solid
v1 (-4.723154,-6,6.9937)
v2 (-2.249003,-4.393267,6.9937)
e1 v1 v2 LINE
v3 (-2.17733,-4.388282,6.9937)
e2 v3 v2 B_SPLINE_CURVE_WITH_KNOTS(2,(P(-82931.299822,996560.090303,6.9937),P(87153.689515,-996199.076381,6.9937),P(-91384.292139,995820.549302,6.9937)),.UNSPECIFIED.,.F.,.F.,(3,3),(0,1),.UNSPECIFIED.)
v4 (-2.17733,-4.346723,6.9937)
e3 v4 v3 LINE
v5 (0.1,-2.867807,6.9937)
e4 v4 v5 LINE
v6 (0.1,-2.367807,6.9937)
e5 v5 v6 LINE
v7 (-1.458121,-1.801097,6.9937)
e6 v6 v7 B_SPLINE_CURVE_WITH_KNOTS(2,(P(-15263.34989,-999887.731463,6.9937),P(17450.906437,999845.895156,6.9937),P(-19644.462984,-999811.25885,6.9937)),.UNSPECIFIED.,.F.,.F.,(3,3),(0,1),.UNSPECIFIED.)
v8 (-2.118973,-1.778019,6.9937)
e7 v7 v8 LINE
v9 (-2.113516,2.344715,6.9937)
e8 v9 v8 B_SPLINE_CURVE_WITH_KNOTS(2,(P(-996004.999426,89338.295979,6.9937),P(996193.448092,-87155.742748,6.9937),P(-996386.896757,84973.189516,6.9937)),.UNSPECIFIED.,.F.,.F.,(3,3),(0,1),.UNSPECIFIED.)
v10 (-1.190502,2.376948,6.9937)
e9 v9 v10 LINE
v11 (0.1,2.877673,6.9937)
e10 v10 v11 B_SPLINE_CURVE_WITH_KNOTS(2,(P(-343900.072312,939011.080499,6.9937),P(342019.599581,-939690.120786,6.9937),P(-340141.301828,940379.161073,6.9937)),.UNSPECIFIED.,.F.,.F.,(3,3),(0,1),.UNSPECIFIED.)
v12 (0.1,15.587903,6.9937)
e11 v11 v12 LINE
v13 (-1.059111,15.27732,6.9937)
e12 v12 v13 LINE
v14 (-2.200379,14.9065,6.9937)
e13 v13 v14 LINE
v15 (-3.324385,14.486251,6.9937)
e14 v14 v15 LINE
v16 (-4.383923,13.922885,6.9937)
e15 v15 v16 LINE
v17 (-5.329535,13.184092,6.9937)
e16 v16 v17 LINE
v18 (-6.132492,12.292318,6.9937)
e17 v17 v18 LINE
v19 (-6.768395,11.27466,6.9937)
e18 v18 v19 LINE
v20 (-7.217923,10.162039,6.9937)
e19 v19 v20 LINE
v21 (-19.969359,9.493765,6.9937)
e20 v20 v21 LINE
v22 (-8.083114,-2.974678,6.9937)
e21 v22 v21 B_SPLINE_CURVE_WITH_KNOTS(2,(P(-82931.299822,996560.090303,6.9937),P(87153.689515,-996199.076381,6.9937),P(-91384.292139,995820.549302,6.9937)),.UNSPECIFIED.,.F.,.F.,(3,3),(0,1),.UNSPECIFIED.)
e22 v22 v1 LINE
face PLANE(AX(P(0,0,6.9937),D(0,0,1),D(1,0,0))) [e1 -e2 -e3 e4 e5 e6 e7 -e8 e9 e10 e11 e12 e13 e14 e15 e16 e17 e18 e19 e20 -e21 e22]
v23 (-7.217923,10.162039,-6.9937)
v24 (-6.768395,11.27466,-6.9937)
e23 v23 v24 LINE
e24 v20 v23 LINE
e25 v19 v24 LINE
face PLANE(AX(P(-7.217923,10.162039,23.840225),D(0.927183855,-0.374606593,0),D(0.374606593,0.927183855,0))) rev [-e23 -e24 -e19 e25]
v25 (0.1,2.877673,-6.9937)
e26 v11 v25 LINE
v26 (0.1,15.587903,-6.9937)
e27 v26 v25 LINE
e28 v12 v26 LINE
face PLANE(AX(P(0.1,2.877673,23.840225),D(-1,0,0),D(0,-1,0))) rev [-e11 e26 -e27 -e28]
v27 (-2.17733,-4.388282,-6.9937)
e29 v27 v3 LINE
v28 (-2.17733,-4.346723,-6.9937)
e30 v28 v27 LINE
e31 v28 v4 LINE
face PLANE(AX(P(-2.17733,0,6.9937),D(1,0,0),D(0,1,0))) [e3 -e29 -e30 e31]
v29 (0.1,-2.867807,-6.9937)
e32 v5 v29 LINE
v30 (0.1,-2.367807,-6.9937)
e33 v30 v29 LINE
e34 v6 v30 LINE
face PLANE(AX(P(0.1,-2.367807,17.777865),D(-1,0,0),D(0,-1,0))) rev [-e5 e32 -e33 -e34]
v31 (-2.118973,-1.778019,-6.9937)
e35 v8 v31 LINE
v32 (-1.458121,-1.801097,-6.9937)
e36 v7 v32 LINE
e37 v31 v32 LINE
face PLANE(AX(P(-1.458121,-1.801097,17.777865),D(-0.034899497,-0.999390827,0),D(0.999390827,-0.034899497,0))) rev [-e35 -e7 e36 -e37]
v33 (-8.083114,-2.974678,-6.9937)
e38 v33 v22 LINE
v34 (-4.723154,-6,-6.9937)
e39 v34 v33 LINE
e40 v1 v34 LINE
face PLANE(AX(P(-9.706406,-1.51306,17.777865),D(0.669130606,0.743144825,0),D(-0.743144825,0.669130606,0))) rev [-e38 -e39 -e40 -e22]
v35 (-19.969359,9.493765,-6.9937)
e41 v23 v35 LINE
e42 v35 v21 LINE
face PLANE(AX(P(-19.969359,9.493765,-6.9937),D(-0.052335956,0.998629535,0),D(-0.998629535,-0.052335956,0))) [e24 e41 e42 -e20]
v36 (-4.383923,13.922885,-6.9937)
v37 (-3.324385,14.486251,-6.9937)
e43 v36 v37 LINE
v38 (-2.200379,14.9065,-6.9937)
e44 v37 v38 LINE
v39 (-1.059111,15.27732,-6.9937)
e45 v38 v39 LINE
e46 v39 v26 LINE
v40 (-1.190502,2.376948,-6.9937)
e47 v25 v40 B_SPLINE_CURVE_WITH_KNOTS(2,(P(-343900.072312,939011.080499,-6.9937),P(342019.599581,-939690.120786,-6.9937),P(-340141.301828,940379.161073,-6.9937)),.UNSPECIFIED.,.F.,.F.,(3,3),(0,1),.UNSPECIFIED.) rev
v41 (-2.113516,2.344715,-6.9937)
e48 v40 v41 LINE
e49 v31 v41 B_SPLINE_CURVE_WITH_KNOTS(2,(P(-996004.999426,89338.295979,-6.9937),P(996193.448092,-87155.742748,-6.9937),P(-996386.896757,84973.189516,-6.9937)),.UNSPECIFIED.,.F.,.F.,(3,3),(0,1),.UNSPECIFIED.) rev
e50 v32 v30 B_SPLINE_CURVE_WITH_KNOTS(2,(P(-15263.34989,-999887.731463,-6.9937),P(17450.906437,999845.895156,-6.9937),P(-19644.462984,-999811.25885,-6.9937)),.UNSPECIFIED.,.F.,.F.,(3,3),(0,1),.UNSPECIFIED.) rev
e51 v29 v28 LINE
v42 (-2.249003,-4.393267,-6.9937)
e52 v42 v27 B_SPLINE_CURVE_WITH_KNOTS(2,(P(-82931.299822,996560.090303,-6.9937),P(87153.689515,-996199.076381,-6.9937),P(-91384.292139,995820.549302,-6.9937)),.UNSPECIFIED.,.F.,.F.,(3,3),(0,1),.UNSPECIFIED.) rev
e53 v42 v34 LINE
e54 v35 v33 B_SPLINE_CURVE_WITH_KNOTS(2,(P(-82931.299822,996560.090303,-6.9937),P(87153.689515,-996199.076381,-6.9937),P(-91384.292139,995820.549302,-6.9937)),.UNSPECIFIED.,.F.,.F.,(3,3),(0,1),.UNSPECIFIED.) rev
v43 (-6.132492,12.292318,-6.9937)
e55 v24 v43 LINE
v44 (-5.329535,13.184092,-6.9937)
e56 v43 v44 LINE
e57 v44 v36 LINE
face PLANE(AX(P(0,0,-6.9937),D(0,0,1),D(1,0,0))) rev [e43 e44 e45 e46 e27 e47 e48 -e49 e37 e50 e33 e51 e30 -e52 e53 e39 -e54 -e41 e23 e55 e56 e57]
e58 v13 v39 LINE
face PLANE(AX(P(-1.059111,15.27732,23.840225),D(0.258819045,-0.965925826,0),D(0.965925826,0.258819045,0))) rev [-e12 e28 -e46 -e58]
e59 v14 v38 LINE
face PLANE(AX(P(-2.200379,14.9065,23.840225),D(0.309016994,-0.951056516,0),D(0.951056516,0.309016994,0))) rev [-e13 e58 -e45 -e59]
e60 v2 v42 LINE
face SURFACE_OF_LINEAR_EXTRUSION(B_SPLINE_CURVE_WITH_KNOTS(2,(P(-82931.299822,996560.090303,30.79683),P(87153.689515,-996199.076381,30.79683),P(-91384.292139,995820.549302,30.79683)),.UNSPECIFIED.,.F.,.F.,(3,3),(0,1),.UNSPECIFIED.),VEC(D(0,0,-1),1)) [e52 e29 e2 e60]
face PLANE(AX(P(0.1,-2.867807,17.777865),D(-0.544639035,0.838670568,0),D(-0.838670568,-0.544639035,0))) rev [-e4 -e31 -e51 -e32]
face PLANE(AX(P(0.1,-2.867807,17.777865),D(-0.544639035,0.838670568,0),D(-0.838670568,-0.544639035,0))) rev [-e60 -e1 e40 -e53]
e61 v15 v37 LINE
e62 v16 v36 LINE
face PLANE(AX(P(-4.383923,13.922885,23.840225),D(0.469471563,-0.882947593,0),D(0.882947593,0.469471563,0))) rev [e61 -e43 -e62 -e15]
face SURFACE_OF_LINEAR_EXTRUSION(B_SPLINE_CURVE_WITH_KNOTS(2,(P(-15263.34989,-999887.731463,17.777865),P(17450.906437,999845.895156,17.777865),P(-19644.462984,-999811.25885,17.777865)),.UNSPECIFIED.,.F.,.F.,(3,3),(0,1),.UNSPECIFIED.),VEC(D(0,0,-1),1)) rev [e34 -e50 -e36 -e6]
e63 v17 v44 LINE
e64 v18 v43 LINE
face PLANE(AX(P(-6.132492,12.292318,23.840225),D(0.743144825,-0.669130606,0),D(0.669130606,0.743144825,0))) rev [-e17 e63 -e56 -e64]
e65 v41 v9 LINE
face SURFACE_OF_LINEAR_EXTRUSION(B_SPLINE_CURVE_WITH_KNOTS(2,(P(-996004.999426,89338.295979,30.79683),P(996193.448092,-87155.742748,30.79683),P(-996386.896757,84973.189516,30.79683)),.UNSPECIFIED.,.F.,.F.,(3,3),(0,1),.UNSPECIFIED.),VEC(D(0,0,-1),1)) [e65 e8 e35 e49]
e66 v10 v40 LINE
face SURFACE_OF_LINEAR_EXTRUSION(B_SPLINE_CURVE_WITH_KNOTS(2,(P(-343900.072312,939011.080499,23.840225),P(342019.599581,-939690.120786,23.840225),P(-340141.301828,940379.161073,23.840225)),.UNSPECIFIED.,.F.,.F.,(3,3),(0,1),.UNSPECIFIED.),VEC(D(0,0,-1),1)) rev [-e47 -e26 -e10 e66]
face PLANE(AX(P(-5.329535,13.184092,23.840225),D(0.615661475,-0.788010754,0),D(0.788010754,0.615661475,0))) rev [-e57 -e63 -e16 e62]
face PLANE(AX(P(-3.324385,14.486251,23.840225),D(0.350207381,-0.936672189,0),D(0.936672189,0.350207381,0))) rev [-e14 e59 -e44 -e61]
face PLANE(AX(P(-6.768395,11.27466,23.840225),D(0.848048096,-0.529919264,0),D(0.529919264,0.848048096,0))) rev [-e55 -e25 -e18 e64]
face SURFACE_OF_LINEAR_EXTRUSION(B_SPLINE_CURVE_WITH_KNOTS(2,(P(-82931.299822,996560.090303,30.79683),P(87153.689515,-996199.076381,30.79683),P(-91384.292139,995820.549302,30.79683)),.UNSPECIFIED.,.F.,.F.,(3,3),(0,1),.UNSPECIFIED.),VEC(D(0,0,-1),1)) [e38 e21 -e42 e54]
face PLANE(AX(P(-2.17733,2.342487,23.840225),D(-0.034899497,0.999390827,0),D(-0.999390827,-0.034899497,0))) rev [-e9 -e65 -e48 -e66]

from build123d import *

# Parameters (mm, degrees)
CROQUIS_BASE_DEPTH              = 6.9937
LENTE_PPAL_1_REACH              = 29.176
LENTE_PPAL_1_DIRECTION_2_REACH  = 29.176
LENTE_PPAL_2_DEPTH              = 28.175928622
LENTE_PPAL_2_DEPTH_BACK         = 28.175928622
CROQUIS9_3_OUTSIDE_W            = 30.065
CROQUIS9_3_OUTSIDE_H            = 25.937
LENTE_FRONTAL_REACH             = 25.403
LENTE_FRONTAL_DIRECTION_2_REACH = 25.403
LENTE_TRASERA_REACH             = 28.281
LENTE_TRASERA_DIRECTION_2_REACH = 28.281


with BuildPart() as part:
    # Croquis1 → croquis base (new, symmetric)
    with BuildSketch(Plane.XY):
        with BuildLine():
            Line((-6.994875026, 10.477389992), (-8.981845695, 12.608155172))
            Line((-8.981845695, 12.608155172), (-23.035921146, 11.871612288))
            Line((-23.035921146, 11.871612288), (-23.035921146, 11.54013782))
            ThreePointArc((-23.035921146, 11.54013782), (-20.949684518, 9.582335705), (-18.945192114, 7.540918896))
            add(Edge.make_bspline(
                [(-18.945192114, 7.540918896), (-10.215008384, -3.697644103), (-2.846604825, -5.059081104)],
                knots=[0.497667241, 0.497667241, 0.497667241, 0.49955428, 0.49955428, 0.49955428], degree=2))
            add(Edge.make_bspline(
                [(-2.846604825, -5.059081104), (-2.498165198, -4.87297933), (-2.177330417, -4.684462446)],
                knots=[0.498812075, 0.498812075, 0.498812075, 0.498911556, 0.498911556, 0.498911556], degree=2))
            Line((-2.177330418, -4.684462446), (-2.177330418, 6.186438919))
            add(Edge.make_bspline(
                [(-2.177330418, 6.186438919), (-4.063319702, 8.141636997), (-6.994875026, 10.477389992)],
                knots=[0.50138293, 0.50138293, 0.50138293, 0.502013312, 0.502013312, 0.502013312], degree=2))
        make_face()
    extrude(amount=CROQUIS_BASE_DEPTH, both=True)

    # lente ppal 1: up to this face of the body (flat: up to its plane)
    lente_ppal_1_end = Plane(part.part.faces().sort_by_distance((-10.153546236, 5.159655324, 6.9937))[0])
    # Croquis9 → lente ppal 1 (add, up to the picked face)
    with BuildSketch(Plane.XY, mode=Mode.PRIVATE) as lente_ppal_1_sk1:
        with BuildLine():
            Line((-2.177330418, -4.388282022), (-2.177330418, -1.840420572))
            add(Edge.make_bspline(
                [(-2.177330418, 2.424232079), (-0.304369248, 0.128042884), (-2.177330418, -1.840420572)],
                knots=[0, 0, 0, 1, 1, 1], degree=2))
            Line((-2.177330418, 2.424232079), (-2.177330418, 6.082860828))
            Line((-2.177330418, 6.082860828), (-10.309820395, 10))
            Line((-10.309820395, 10), (-19.969359014, 9.493765032))
            add(Edge.make_bspline(
                [(-2.177330418, -4.388282022), (-10.4130765, -4.994158739), (-19.969359014, 9.493765032)],
                knots=[0, 0, 0, 1, 1, 1], degree=2))
        make_face()
    lente_ppal_1_tool1 = split(extrude(lente_ppal_1_sk1.sketch, amount=LENTE_PPAL_1_REACH, mode=Mode.PRIVATE), bisect_by=lente_ppal_1_end, keep=Keep.BOTH, mode=Mode.PRIVATE)
    add(lente_ppal_1_tool1.solids().sort_by(Axis((-9.106368, 3.599172, 0), (0, 0, 1)))[0])

    # lente ppal 1 direction 2: up to this face of the body (flat: up to its plane)
    lente_ppal_1_direction_2_end = Plane(part.part.faces().sort_by_distance((-10.153546236, 5.159655324, -6.9937))[0])
    # Croquis9 → lente ppal 1 direction 2 (add, up to the picked face)
    with BuildSketch(Plane.XY, mode=Mode.PRIVATE) as lente_ppal_1_direction_2_sk1:
        with BuildLine():
            Line((-2.177330418, -4.388282022), (-2.177330418, -1.840420572))
            add(Edge.make_bspline(
                [(-2.177330418, 2.424232079), (-0.304369248, 0.128042884), (-2.177330418, -1.840420572)],
                knots=[0, 0, 0, 1, 1, 1], degree=2))
            Line((-2.177330418, 2.424232079), (-2.177330418, 6.082860828))
            Line((-2.177330418, 6.082860828), (-10.309820395, 10))
            Line((-10.309820395, 10), (-19.969359014, 9.493765032))
            add(Edge.make_bspline(
                [(-2.177330418, -4.388282022), (-10.4130765, -4.994158739), (-19.969359014, 9.493765032)],
                knots=[0, 0, 0, 1, 1, 1], degree=2))
        make_face()
    lente_ppal_1_direction_2_tool1 = split(extrude(lente_ppal_1_direction_2_sk1.sketch, amount=-LENTE_PPAL_1_DIRECTION_2_REACH, mode=Mode.PRIVATE), bisect_by=lente_ppal_1_direction_2_end, keep=Keep.BOTH, mode=Mode.PRIVATE)
    add(lente_ppal_1_direction_2_tool1.solids().sort_by(Axis((-9.106368, 3.599172, 0), (0, 0, -1)))[0])

    # Croquis9<3> outside → lente ppal 2 (cut, two sides: drawn at the far end of the back side and taken through both)
    with BuildSketch(Plane.XY.offset(-LENTE_PPAL_2_DEPTH_BACK)):
        with Locations((-12.1385, 3.7745)):
            Rectangle(CROQUIS9_3_OUTSIDE_W, CROQUIS9_3_OUTSIDE_H)
        with BuildLine():
            Line((-2.177330418, -1.840420572), (-2.177330418, -4.388282022))
            add(Edge.make_bspline(
                [(-2.177330418, -4.388282022), (-10.4130765, -4.994158739), (-19.969359014, 9.493765032)],
                knots=[0, 0, 0, 1, 1, 1], degree=2))
            Line((-19.969359014, 9.493765032), (-10.309820395, 10))
            Line((-10.309820395, 10), (-2.177330418, 6.082860828))
            Line((-2.177330418, 6.082860828), (-2.177330418, 2.424232079))
            add(Edge.make_bspline(
                [(-2.177330418, 2.424232079), (-0.304369248, 0.128042884), (-2.177330418, -1.840420572)],
                knots=[0, 0, 0, 1, 1, 1], degree=2))
        make_face(mode=Mode.SUBTRACT)
    extrude(amount=LENTE_PPAL_2_DEPTH + LENTE_PPAL_2_DEPTH_BACK, mode=Mode.SUBTRACT)

    # lente frontal: up to this face of the body (flat: up to its plane)
    lente_frontal_end = Plane(part.part.faces().sort_by_distance((-9.106367081, 3.599171888, 6.9937))[0])
    # Croquis8 → lente frontal (add, up to the picked face)
    with BuildSketch(Plane.XY, mode=Mode.PRIVATE) as lente_frontal_sk1:
        with BuildLine():
            Line((0.1, 2.877673418), (0.1, 15.587903347))
            Line((0.1, 15.587903347), (-1.059110992, 15.277320493))
            Line((-1.059110992, 15.277320493), (-2.200378811, 14.9065001))
            Line((-2.200378811, 14.9065001), (-3.324385438, 14.486251242))
            Line((-3.324385438, 14.486251242), (-4.38392255, 13.922885367))
            Line((-4.38392255, 13.922885367), (-5.329535454, 13.184091597))
            Line((-5.329535454, 13.184091597), (-6.132492182, 12.292317806))
            Line((-6.132492182, 12.292317806), (-6.768395299, 11.274660091))
            Line((-6.768395299, 11.274660091), (-7.217923211, 10.162039465))
            Line((-7.217923211, 10.162039465), (-10.309820395, 10))
            Line((-10.309820395, 10), (-2.177330418, 2.342487007))
            Line((-2.177330418, 2.342487007), (-1.190501641, 2.376947827))
            add(Edge.make_bspline(
                [(-1.190501641, 2.376947827), (-0.463368169, 2.402339888), (0.1, 2.877673418)],
                knots=[0, 0, 0, 1, 1, 1], degree=2))
        make_face()
    lente_frontal_tool1 = split(extrude(lente_frontal_sk1.sketch, amount=LENTE_FRONTAL_REACH, mode=Mode.PRIVATE), bisect_by=lente_frontal_end, keep=Keep.BOTH, mode=Mode.PRIVATE)
    add(lente_frontal_tool1.solids().sort_by(Axis((-3.290182, 8.96302, 0), (0, 0, 1)))[0])

    # lente frontal direction 2: up to this face of the body (flat: up to its plane)
    lente_frontal_direction_2_end = Plane(part.part.faces().sort_by_distance((-9.106367081, 3.599171888, -6.9937))[0])
    # Croquis8 → lente frontal direction 2 (add, up to the picked face)
    with BuildSketch(Plane.XY, mode=Mode.PRIVATE) as lente_frontal_direction_2_sk1:
        with BuildLine():
            Line((0.1, 2.877673418), (0.1, 15.587903347))
            Line((0.1, 15.587903347), (-1.059110992, 15.277320493))
            Line((-1.059110992, 15.277320493), (-2.200378811, 14.9065001))
            Line((-2.200378811, 14.9065001), (-3.324385438, 14.486251242))
            Line((-3.324385438, 14.486251242), (-4.38392255, 13.922885367))
            Line((-4.38392255, 13.922885367), (-5.329535454, 13.184091597))
            Line((-5.329535454, 13.184091597), (-6.132492182, 12.292317806))
            Line((-6.132492182, 12.292317806), (-6.768395299, 11.274660091))
            Line((-6.768395299, 11.274660091), (-7.217923211, 10.162039465))
            Line((-7.217923211, 10.162039465), (-10.309820395, 10))
            Line((-10.309820395, 10), (-2.177330418, 2.342487007))
            Line((-2.177330418, 2.342487007), (-1.190501641, 2.376947827))
            add(Edge.make_bspline(
                [(-1.190501641, 2.376947827), (-0.463368169, 2.402339888), (0.1, 2.877673418)],
                knots=[0, 0, 0, 1, 1, 1], degree=2))
        make_face()
    lente_frontal_direction_2_tool1 = split(extrude(lente_frontal_direction_2_sk1.sketch, amount=-LENTE_FRONTAL_DIRECTION_2_REACH, mode=Mode.PRIVATE), bisect_by=lente_frontal_direction_2_end, keep=Keep.BOTH, mode=Mode.PRIVATE)
    add(lente_frontal_direction_2_tool1.solids().sort_by(Axis((-3.290182, 8.96302, 0), (0, 0, -1)))[0])

    # lente trasera: up to this face of the body (flat: up to its plane)
    lente_trasera_end = Plane(part.part.faces().sort_by_distance((-7.357064552, 5.305385386, 6.9937))[0])
    # Croquis11 → lente trasera (add, up to the picked face)
    with BuildSketch(Plane.XY, mode=Mode.PRIVATE) as lente_trasera_sk1:
        with BuildLine():
            Line((0.1, -2.367807069), (0.1, -2.867807069))
            Line((0.1, -2.867807069), (-4.723154154, -6))
            Line((-4.723154154, -6), (-9.706405629, -1.513060218))
            Line((-9.706405629, -1.513060218), (-1.458120605, -1.801096678))
            add(Edge.make_bspline(
                [(-1.458120605, -1.801096678), (-0.674591915, -1.828458103), (0.1, -2.367807069)],
                knots=[0, 0, 0, 1, 1, 1], degree=2))
        make_face()
    lente_trasera_tool1 = split(extrude(lente_trasera_sk1.sketch, amount=LENTE_TRASERA_REACH, mode=Mode.PRIVATE), bisect_by=lente_trasera_end, keep=Keep.BOTH, mode=Mode.PRIVATE)
    add(lente_trasera_tool1.solids().sort_by(Axis((-4.485422, -3.182948, 0), (0, 0, 1)))[0])

    # lente trasera direction 2: up to this face of the body (flat: up to its plane)
    lente_trasera_direction_2_end = Plane(part.part.faces().sort_by_distance((-7.357064552, 5.305385386, -6.9937))[0])
    # Croquis11 → lente trasera direction 2 (add, up to the picked face)
    with BuildSketch(Plane.XY, mode=Mode.PRIVATE) as lente_trasera_direction_2_sk1:
        with BuildLine():
            Line((0.1, -2.367807069), (0.1, -2.867807069))
            Line((0.1, -2.867807069), (-4.723154154, -6))
            Line((-4.723154154, -6), (-9.706405629, -1.513060218))
            Line((-9.706405629, -1.513060218), (-1.458120605, -1.801096678))
            add(Edge.make_bspline(
                [(-1.458120605, -1.801096678), (-0.674591915, -1.828458103), (0.1, -2.367807069)],
                knots=[0, 0, 0, 1, 1, 1], degree=2))
        make_face()
    lente_trasera_direction_2_tool1 = split(extrude(lente_trasera_direction_2_sk1.sketch, amount=-LENTE_TRASERA_DIRECTION_2_REACH, mode=Mode.PRIVATE), bisect_by=lente_trasera_direction_2_end, keep=Keep.BOTH, mode=Mode.PRIVATE)
    add(lente_trasera_direction_2_tool1.solids().sort_by(Axis((-4.485422, -3.182948, 0), (0, 0, -1)))[0])


solid = part.part
